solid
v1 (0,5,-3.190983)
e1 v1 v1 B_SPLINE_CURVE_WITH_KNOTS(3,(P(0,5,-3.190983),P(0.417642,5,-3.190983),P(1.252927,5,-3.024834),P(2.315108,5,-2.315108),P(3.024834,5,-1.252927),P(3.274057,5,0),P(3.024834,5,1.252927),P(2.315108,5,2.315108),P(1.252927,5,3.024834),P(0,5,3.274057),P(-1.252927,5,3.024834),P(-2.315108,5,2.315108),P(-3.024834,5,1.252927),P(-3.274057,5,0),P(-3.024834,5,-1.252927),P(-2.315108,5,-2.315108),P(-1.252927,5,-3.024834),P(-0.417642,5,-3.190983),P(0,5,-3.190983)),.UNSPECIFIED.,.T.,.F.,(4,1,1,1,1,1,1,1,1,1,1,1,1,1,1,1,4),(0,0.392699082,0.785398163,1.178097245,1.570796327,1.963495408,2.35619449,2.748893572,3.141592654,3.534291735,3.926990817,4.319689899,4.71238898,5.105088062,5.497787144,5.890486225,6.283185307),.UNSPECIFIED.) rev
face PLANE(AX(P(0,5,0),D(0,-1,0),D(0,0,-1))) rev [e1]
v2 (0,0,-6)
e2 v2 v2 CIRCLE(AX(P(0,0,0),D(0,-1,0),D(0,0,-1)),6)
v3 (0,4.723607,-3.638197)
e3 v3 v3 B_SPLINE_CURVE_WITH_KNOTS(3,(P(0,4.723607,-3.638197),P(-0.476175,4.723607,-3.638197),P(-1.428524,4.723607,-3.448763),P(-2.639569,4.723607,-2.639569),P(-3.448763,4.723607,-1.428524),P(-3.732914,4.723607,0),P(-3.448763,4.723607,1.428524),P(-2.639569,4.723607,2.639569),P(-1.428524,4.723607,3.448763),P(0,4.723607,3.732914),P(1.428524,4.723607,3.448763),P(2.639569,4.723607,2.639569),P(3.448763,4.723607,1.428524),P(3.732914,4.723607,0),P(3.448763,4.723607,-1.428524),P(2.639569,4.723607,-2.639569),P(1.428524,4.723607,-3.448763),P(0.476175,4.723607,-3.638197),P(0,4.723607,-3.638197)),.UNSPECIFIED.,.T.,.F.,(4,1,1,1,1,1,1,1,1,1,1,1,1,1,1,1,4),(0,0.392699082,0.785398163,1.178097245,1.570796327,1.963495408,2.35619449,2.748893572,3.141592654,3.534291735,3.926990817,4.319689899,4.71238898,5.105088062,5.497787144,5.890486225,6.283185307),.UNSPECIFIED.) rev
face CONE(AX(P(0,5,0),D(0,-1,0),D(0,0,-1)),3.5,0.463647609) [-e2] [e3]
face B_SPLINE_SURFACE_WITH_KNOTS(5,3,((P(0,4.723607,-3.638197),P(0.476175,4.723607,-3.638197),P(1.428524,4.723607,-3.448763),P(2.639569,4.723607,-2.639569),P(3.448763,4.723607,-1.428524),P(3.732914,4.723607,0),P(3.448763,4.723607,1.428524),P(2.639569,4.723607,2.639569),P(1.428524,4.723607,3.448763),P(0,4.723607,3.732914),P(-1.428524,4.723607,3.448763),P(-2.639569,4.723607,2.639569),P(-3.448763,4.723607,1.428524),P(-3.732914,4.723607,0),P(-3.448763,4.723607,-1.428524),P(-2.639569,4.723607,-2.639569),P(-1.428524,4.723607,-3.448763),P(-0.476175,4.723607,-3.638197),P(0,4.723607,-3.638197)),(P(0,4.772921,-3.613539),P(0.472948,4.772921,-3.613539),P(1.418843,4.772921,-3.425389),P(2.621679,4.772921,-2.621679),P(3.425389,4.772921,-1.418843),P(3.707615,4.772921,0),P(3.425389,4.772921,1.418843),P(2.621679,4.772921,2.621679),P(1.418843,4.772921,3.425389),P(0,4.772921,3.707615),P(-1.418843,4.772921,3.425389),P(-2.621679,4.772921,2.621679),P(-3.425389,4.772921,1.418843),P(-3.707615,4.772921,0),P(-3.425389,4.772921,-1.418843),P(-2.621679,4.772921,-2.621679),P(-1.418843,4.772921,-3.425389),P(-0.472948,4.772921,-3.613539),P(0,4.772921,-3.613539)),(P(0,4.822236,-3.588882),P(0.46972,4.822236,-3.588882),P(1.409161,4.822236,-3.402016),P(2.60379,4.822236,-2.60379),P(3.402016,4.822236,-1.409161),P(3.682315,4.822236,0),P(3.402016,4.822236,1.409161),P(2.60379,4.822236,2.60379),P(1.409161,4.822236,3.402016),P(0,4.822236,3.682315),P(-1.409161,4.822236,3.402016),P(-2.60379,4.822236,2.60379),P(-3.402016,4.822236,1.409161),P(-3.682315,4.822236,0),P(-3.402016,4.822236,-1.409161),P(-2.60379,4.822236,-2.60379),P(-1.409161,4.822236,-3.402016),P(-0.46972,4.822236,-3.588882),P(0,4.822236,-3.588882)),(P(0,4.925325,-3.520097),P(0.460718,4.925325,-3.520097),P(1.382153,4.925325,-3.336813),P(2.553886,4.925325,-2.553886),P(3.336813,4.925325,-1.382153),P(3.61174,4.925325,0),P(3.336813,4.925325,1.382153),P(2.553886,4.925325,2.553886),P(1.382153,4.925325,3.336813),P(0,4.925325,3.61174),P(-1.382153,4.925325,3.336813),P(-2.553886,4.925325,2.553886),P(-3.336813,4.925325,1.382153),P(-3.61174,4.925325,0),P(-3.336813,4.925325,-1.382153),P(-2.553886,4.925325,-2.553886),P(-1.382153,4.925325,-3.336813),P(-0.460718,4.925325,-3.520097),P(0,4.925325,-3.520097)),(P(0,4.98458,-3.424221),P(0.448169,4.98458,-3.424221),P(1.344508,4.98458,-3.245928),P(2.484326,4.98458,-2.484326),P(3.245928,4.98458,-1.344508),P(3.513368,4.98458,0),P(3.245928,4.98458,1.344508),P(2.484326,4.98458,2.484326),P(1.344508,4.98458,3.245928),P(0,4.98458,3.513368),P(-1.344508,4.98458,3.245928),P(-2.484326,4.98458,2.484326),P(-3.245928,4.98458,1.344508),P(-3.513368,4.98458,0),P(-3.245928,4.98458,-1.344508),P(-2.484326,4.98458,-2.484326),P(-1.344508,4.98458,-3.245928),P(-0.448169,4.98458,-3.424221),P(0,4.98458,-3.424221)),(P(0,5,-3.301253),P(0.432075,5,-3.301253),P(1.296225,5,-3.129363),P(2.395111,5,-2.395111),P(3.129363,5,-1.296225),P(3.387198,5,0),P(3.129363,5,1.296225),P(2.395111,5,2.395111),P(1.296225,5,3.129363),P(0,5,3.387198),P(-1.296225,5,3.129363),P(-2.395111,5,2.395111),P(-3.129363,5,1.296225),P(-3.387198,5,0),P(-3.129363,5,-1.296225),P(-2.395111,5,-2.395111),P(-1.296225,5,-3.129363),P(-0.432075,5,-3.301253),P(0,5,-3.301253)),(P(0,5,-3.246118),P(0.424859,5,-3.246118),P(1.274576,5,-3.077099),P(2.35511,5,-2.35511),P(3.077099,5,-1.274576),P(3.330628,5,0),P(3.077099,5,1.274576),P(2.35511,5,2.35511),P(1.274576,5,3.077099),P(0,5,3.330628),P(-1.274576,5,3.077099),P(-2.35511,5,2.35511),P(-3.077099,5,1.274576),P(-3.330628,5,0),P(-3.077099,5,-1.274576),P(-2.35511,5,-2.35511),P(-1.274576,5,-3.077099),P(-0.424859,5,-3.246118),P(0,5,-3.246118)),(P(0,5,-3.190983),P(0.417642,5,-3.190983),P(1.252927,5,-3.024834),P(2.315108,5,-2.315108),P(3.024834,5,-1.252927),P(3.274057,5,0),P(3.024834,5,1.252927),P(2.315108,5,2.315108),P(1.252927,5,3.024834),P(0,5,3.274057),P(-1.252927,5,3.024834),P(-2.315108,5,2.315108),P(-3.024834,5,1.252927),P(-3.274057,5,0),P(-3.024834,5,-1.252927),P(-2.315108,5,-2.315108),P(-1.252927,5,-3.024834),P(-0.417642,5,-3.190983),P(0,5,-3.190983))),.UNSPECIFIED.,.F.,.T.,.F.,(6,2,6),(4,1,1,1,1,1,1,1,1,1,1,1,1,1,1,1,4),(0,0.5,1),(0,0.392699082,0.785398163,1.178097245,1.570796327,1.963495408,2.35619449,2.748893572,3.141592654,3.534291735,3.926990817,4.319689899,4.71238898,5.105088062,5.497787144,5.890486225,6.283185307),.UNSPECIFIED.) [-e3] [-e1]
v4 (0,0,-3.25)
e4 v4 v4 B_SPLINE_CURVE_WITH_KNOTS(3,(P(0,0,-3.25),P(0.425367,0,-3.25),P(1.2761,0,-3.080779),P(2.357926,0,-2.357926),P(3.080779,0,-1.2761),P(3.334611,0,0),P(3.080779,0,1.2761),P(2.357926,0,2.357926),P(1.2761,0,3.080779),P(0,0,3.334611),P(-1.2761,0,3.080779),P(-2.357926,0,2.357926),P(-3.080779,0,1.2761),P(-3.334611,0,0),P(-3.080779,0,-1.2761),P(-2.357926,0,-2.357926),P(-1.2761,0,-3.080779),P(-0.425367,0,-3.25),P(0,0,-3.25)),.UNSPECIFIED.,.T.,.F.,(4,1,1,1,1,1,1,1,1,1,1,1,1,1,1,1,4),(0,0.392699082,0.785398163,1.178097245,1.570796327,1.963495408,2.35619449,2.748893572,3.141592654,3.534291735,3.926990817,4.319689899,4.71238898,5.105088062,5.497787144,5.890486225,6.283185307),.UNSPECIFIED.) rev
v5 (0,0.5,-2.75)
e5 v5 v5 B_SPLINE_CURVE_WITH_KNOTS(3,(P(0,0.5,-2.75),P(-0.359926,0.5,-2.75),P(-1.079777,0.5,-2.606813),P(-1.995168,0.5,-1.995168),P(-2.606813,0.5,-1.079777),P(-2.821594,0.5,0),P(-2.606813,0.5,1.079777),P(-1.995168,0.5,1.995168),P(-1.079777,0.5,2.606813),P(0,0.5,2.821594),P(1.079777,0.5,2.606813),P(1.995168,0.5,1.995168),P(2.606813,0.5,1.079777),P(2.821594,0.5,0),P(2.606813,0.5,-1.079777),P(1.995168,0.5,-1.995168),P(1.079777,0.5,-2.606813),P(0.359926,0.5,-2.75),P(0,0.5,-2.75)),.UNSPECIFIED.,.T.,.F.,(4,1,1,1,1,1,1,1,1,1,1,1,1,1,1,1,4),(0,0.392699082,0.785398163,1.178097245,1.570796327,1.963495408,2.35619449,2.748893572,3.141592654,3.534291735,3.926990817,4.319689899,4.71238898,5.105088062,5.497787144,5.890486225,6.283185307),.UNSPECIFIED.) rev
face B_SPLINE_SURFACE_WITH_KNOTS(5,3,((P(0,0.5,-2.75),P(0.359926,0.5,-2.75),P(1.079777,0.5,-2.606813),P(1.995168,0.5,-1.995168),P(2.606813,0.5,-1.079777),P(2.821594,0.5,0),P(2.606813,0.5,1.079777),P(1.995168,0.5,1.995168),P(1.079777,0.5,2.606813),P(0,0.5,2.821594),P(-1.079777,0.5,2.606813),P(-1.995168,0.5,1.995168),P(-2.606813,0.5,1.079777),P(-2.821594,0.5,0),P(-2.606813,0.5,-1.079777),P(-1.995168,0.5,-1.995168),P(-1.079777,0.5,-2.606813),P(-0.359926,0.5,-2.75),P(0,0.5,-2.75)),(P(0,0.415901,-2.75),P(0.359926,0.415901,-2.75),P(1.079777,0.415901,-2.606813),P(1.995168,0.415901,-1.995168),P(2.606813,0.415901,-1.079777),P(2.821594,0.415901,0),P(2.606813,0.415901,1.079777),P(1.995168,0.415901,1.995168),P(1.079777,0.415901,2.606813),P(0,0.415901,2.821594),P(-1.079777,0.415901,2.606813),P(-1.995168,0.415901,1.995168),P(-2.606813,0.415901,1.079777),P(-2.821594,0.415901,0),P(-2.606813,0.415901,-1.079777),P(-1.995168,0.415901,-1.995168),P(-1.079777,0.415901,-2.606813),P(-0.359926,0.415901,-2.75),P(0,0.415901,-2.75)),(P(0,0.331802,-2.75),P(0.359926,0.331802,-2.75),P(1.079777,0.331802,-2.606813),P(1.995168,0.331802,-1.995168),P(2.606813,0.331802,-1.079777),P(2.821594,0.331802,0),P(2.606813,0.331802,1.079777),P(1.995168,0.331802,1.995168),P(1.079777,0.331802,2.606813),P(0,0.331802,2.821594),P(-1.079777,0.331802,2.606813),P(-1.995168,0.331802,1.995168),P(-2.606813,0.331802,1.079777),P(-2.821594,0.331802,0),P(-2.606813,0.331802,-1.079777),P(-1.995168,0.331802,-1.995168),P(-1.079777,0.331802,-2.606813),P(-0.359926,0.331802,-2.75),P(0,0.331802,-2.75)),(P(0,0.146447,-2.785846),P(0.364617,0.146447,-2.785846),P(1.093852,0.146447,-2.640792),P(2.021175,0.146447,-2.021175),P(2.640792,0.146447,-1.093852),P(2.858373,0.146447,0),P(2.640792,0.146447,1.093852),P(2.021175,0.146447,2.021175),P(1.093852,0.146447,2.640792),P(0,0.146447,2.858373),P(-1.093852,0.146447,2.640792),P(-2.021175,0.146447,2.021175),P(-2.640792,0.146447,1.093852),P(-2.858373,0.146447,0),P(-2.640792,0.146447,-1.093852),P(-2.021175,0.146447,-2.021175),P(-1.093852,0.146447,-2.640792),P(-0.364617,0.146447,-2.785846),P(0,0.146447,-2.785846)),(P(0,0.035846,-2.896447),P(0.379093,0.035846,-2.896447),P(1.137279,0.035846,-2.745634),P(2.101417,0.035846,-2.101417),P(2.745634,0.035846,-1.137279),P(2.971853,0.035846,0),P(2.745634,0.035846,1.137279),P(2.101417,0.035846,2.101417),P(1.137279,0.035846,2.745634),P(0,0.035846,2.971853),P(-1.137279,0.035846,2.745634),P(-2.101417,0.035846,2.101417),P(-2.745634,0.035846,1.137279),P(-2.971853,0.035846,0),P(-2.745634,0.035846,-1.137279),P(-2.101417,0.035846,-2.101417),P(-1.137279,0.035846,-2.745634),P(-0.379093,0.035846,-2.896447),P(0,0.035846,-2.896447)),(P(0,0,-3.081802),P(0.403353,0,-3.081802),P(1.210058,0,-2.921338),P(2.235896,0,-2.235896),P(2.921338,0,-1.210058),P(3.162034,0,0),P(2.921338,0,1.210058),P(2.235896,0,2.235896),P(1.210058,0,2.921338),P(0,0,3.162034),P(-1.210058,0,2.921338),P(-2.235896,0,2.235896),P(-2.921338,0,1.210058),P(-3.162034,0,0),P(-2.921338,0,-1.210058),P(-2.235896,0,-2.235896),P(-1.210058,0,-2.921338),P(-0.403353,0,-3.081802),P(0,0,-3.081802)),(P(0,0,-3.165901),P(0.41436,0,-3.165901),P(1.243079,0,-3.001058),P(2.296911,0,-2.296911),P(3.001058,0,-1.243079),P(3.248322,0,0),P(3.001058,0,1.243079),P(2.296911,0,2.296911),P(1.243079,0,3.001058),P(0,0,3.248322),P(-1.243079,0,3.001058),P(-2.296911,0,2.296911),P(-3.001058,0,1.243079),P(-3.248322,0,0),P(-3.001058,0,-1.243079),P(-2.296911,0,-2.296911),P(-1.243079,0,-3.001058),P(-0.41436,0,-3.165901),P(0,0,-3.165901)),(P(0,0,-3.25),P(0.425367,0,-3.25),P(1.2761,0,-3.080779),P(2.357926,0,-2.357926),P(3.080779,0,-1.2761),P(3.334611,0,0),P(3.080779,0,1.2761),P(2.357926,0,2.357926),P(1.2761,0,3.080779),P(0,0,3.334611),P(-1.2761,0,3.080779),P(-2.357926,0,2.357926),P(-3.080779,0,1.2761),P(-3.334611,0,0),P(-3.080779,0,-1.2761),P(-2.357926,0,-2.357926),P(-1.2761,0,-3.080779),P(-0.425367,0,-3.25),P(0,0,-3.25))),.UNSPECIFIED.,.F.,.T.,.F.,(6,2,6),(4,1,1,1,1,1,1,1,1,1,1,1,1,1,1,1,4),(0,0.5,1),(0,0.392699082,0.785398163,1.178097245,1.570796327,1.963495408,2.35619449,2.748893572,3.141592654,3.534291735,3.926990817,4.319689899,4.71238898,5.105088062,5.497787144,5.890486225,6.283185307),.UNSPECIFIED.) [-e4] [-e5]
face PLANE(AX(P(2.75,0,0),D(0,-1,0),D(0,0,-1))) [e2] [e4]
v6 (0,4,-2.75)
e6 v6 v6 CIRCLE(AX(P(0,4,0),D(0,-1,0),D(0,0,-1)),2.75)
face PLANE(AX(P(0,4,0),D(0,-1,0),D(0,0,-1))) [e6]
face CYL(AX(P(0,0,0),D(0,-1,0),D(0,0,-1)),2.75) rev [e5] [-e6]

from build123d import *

# Parameters (mm, degrees)
FILLET2_SIZE = 0.5


with BuildPart() as part:
    # Sketch1 → Revolve1 (revolve)
    with BuildSketch(Plane.XY, mode=Mode.PRIVATE) as revolve1_sk:
        Polygon((0, 5), (3.5, 5), (6, 0), (2.75, 0), (2.75, 4), (0, 4), align=None)
    revolve(revolve1_sk.sketch.rotate(Axis((0, 0, 0), (0, 1, 0)), 90), axis=Axis((0, 0, 0), (0, 1, 0)))

    # Fillet1
    # a fillet whose section is not a circle: 0.5 mm, written as the material it takes off along each edge
    with BuildSketch(Plane(origin=(0, 5, 0), x_dir=(0, 0, -1), z_dir=(1, 0, 0))) as fillet1_piece_1:
        with BuildLine():
            add(Edge.make_bspline([(3.190983006, 0), (3.246118173, 0), (3.30125334, 0), (3.424221159, -0.01541979), (3.520097448, -0.074674596), (3.588882209, -0.177764417), (3.613539405, -0.22707881), (3.638196601, -0.276393202)], knots=[0, 0, 0, 0, 0, 0, 0.5, 0.5, 1, 1, 1, 1, 1, 1], degree=5))
            Line((3.638196601, -0.276393202), (3.5, 0))
            Line((3.5, 0), (3.190983006, 0))
        make_face()
    revolve(axis=Axis((0, 5, 0), (0, 1, 0)), mode=Mode.SUBTRACT)

    # Fillet2
    # a fillet whose section is not a circle: 0.5 mm, written as the material it takes off along each edge
    with BuildSketch(Plane(origin=(0, 0, 0), x_dir=(0, 0, -1), z_dir=(1, 0, 0))) as fillet2_piece_1:
        with BuildLine():
            add(Edge.make_bspline([(2.75 + FILLET2_SIZE, 0), (2.75 + FILLET2_SIZE * 0.831801948466, 0), (2.75 + FILLET2_SIZE * 0.663603896932, 0), (2.75 + FILLET2_SIZE * 0.292893218813, FILLET2_SIZE * 0.0716919198361), (2.75 + FILLET2_SIZE * 0.0716919198361, FILLET2_SIZE * 0.292893218813), (2.75, FILLET2_SIZE * 0.663603896932), (2.75, FILLET2_SIZE * 0.831801948466), (2.75, FILLET2_SIZE)], knots=[0, 0, 0, 0, 0, 0, 0.5, 0.5, 1, 1, 1, 1, 1, 1], degree=5))
            Line((2.75, FILLET2_SIZE), (2.75, 0))
            Line((2.75, 0), (2.75 + FILLET2_SIZE, 0))
        make_face()
    revolve(axis=Axis((0, 0, 0), (0, 1, 0)), mode=Mode.SUBTRACT)


solid = part.part
